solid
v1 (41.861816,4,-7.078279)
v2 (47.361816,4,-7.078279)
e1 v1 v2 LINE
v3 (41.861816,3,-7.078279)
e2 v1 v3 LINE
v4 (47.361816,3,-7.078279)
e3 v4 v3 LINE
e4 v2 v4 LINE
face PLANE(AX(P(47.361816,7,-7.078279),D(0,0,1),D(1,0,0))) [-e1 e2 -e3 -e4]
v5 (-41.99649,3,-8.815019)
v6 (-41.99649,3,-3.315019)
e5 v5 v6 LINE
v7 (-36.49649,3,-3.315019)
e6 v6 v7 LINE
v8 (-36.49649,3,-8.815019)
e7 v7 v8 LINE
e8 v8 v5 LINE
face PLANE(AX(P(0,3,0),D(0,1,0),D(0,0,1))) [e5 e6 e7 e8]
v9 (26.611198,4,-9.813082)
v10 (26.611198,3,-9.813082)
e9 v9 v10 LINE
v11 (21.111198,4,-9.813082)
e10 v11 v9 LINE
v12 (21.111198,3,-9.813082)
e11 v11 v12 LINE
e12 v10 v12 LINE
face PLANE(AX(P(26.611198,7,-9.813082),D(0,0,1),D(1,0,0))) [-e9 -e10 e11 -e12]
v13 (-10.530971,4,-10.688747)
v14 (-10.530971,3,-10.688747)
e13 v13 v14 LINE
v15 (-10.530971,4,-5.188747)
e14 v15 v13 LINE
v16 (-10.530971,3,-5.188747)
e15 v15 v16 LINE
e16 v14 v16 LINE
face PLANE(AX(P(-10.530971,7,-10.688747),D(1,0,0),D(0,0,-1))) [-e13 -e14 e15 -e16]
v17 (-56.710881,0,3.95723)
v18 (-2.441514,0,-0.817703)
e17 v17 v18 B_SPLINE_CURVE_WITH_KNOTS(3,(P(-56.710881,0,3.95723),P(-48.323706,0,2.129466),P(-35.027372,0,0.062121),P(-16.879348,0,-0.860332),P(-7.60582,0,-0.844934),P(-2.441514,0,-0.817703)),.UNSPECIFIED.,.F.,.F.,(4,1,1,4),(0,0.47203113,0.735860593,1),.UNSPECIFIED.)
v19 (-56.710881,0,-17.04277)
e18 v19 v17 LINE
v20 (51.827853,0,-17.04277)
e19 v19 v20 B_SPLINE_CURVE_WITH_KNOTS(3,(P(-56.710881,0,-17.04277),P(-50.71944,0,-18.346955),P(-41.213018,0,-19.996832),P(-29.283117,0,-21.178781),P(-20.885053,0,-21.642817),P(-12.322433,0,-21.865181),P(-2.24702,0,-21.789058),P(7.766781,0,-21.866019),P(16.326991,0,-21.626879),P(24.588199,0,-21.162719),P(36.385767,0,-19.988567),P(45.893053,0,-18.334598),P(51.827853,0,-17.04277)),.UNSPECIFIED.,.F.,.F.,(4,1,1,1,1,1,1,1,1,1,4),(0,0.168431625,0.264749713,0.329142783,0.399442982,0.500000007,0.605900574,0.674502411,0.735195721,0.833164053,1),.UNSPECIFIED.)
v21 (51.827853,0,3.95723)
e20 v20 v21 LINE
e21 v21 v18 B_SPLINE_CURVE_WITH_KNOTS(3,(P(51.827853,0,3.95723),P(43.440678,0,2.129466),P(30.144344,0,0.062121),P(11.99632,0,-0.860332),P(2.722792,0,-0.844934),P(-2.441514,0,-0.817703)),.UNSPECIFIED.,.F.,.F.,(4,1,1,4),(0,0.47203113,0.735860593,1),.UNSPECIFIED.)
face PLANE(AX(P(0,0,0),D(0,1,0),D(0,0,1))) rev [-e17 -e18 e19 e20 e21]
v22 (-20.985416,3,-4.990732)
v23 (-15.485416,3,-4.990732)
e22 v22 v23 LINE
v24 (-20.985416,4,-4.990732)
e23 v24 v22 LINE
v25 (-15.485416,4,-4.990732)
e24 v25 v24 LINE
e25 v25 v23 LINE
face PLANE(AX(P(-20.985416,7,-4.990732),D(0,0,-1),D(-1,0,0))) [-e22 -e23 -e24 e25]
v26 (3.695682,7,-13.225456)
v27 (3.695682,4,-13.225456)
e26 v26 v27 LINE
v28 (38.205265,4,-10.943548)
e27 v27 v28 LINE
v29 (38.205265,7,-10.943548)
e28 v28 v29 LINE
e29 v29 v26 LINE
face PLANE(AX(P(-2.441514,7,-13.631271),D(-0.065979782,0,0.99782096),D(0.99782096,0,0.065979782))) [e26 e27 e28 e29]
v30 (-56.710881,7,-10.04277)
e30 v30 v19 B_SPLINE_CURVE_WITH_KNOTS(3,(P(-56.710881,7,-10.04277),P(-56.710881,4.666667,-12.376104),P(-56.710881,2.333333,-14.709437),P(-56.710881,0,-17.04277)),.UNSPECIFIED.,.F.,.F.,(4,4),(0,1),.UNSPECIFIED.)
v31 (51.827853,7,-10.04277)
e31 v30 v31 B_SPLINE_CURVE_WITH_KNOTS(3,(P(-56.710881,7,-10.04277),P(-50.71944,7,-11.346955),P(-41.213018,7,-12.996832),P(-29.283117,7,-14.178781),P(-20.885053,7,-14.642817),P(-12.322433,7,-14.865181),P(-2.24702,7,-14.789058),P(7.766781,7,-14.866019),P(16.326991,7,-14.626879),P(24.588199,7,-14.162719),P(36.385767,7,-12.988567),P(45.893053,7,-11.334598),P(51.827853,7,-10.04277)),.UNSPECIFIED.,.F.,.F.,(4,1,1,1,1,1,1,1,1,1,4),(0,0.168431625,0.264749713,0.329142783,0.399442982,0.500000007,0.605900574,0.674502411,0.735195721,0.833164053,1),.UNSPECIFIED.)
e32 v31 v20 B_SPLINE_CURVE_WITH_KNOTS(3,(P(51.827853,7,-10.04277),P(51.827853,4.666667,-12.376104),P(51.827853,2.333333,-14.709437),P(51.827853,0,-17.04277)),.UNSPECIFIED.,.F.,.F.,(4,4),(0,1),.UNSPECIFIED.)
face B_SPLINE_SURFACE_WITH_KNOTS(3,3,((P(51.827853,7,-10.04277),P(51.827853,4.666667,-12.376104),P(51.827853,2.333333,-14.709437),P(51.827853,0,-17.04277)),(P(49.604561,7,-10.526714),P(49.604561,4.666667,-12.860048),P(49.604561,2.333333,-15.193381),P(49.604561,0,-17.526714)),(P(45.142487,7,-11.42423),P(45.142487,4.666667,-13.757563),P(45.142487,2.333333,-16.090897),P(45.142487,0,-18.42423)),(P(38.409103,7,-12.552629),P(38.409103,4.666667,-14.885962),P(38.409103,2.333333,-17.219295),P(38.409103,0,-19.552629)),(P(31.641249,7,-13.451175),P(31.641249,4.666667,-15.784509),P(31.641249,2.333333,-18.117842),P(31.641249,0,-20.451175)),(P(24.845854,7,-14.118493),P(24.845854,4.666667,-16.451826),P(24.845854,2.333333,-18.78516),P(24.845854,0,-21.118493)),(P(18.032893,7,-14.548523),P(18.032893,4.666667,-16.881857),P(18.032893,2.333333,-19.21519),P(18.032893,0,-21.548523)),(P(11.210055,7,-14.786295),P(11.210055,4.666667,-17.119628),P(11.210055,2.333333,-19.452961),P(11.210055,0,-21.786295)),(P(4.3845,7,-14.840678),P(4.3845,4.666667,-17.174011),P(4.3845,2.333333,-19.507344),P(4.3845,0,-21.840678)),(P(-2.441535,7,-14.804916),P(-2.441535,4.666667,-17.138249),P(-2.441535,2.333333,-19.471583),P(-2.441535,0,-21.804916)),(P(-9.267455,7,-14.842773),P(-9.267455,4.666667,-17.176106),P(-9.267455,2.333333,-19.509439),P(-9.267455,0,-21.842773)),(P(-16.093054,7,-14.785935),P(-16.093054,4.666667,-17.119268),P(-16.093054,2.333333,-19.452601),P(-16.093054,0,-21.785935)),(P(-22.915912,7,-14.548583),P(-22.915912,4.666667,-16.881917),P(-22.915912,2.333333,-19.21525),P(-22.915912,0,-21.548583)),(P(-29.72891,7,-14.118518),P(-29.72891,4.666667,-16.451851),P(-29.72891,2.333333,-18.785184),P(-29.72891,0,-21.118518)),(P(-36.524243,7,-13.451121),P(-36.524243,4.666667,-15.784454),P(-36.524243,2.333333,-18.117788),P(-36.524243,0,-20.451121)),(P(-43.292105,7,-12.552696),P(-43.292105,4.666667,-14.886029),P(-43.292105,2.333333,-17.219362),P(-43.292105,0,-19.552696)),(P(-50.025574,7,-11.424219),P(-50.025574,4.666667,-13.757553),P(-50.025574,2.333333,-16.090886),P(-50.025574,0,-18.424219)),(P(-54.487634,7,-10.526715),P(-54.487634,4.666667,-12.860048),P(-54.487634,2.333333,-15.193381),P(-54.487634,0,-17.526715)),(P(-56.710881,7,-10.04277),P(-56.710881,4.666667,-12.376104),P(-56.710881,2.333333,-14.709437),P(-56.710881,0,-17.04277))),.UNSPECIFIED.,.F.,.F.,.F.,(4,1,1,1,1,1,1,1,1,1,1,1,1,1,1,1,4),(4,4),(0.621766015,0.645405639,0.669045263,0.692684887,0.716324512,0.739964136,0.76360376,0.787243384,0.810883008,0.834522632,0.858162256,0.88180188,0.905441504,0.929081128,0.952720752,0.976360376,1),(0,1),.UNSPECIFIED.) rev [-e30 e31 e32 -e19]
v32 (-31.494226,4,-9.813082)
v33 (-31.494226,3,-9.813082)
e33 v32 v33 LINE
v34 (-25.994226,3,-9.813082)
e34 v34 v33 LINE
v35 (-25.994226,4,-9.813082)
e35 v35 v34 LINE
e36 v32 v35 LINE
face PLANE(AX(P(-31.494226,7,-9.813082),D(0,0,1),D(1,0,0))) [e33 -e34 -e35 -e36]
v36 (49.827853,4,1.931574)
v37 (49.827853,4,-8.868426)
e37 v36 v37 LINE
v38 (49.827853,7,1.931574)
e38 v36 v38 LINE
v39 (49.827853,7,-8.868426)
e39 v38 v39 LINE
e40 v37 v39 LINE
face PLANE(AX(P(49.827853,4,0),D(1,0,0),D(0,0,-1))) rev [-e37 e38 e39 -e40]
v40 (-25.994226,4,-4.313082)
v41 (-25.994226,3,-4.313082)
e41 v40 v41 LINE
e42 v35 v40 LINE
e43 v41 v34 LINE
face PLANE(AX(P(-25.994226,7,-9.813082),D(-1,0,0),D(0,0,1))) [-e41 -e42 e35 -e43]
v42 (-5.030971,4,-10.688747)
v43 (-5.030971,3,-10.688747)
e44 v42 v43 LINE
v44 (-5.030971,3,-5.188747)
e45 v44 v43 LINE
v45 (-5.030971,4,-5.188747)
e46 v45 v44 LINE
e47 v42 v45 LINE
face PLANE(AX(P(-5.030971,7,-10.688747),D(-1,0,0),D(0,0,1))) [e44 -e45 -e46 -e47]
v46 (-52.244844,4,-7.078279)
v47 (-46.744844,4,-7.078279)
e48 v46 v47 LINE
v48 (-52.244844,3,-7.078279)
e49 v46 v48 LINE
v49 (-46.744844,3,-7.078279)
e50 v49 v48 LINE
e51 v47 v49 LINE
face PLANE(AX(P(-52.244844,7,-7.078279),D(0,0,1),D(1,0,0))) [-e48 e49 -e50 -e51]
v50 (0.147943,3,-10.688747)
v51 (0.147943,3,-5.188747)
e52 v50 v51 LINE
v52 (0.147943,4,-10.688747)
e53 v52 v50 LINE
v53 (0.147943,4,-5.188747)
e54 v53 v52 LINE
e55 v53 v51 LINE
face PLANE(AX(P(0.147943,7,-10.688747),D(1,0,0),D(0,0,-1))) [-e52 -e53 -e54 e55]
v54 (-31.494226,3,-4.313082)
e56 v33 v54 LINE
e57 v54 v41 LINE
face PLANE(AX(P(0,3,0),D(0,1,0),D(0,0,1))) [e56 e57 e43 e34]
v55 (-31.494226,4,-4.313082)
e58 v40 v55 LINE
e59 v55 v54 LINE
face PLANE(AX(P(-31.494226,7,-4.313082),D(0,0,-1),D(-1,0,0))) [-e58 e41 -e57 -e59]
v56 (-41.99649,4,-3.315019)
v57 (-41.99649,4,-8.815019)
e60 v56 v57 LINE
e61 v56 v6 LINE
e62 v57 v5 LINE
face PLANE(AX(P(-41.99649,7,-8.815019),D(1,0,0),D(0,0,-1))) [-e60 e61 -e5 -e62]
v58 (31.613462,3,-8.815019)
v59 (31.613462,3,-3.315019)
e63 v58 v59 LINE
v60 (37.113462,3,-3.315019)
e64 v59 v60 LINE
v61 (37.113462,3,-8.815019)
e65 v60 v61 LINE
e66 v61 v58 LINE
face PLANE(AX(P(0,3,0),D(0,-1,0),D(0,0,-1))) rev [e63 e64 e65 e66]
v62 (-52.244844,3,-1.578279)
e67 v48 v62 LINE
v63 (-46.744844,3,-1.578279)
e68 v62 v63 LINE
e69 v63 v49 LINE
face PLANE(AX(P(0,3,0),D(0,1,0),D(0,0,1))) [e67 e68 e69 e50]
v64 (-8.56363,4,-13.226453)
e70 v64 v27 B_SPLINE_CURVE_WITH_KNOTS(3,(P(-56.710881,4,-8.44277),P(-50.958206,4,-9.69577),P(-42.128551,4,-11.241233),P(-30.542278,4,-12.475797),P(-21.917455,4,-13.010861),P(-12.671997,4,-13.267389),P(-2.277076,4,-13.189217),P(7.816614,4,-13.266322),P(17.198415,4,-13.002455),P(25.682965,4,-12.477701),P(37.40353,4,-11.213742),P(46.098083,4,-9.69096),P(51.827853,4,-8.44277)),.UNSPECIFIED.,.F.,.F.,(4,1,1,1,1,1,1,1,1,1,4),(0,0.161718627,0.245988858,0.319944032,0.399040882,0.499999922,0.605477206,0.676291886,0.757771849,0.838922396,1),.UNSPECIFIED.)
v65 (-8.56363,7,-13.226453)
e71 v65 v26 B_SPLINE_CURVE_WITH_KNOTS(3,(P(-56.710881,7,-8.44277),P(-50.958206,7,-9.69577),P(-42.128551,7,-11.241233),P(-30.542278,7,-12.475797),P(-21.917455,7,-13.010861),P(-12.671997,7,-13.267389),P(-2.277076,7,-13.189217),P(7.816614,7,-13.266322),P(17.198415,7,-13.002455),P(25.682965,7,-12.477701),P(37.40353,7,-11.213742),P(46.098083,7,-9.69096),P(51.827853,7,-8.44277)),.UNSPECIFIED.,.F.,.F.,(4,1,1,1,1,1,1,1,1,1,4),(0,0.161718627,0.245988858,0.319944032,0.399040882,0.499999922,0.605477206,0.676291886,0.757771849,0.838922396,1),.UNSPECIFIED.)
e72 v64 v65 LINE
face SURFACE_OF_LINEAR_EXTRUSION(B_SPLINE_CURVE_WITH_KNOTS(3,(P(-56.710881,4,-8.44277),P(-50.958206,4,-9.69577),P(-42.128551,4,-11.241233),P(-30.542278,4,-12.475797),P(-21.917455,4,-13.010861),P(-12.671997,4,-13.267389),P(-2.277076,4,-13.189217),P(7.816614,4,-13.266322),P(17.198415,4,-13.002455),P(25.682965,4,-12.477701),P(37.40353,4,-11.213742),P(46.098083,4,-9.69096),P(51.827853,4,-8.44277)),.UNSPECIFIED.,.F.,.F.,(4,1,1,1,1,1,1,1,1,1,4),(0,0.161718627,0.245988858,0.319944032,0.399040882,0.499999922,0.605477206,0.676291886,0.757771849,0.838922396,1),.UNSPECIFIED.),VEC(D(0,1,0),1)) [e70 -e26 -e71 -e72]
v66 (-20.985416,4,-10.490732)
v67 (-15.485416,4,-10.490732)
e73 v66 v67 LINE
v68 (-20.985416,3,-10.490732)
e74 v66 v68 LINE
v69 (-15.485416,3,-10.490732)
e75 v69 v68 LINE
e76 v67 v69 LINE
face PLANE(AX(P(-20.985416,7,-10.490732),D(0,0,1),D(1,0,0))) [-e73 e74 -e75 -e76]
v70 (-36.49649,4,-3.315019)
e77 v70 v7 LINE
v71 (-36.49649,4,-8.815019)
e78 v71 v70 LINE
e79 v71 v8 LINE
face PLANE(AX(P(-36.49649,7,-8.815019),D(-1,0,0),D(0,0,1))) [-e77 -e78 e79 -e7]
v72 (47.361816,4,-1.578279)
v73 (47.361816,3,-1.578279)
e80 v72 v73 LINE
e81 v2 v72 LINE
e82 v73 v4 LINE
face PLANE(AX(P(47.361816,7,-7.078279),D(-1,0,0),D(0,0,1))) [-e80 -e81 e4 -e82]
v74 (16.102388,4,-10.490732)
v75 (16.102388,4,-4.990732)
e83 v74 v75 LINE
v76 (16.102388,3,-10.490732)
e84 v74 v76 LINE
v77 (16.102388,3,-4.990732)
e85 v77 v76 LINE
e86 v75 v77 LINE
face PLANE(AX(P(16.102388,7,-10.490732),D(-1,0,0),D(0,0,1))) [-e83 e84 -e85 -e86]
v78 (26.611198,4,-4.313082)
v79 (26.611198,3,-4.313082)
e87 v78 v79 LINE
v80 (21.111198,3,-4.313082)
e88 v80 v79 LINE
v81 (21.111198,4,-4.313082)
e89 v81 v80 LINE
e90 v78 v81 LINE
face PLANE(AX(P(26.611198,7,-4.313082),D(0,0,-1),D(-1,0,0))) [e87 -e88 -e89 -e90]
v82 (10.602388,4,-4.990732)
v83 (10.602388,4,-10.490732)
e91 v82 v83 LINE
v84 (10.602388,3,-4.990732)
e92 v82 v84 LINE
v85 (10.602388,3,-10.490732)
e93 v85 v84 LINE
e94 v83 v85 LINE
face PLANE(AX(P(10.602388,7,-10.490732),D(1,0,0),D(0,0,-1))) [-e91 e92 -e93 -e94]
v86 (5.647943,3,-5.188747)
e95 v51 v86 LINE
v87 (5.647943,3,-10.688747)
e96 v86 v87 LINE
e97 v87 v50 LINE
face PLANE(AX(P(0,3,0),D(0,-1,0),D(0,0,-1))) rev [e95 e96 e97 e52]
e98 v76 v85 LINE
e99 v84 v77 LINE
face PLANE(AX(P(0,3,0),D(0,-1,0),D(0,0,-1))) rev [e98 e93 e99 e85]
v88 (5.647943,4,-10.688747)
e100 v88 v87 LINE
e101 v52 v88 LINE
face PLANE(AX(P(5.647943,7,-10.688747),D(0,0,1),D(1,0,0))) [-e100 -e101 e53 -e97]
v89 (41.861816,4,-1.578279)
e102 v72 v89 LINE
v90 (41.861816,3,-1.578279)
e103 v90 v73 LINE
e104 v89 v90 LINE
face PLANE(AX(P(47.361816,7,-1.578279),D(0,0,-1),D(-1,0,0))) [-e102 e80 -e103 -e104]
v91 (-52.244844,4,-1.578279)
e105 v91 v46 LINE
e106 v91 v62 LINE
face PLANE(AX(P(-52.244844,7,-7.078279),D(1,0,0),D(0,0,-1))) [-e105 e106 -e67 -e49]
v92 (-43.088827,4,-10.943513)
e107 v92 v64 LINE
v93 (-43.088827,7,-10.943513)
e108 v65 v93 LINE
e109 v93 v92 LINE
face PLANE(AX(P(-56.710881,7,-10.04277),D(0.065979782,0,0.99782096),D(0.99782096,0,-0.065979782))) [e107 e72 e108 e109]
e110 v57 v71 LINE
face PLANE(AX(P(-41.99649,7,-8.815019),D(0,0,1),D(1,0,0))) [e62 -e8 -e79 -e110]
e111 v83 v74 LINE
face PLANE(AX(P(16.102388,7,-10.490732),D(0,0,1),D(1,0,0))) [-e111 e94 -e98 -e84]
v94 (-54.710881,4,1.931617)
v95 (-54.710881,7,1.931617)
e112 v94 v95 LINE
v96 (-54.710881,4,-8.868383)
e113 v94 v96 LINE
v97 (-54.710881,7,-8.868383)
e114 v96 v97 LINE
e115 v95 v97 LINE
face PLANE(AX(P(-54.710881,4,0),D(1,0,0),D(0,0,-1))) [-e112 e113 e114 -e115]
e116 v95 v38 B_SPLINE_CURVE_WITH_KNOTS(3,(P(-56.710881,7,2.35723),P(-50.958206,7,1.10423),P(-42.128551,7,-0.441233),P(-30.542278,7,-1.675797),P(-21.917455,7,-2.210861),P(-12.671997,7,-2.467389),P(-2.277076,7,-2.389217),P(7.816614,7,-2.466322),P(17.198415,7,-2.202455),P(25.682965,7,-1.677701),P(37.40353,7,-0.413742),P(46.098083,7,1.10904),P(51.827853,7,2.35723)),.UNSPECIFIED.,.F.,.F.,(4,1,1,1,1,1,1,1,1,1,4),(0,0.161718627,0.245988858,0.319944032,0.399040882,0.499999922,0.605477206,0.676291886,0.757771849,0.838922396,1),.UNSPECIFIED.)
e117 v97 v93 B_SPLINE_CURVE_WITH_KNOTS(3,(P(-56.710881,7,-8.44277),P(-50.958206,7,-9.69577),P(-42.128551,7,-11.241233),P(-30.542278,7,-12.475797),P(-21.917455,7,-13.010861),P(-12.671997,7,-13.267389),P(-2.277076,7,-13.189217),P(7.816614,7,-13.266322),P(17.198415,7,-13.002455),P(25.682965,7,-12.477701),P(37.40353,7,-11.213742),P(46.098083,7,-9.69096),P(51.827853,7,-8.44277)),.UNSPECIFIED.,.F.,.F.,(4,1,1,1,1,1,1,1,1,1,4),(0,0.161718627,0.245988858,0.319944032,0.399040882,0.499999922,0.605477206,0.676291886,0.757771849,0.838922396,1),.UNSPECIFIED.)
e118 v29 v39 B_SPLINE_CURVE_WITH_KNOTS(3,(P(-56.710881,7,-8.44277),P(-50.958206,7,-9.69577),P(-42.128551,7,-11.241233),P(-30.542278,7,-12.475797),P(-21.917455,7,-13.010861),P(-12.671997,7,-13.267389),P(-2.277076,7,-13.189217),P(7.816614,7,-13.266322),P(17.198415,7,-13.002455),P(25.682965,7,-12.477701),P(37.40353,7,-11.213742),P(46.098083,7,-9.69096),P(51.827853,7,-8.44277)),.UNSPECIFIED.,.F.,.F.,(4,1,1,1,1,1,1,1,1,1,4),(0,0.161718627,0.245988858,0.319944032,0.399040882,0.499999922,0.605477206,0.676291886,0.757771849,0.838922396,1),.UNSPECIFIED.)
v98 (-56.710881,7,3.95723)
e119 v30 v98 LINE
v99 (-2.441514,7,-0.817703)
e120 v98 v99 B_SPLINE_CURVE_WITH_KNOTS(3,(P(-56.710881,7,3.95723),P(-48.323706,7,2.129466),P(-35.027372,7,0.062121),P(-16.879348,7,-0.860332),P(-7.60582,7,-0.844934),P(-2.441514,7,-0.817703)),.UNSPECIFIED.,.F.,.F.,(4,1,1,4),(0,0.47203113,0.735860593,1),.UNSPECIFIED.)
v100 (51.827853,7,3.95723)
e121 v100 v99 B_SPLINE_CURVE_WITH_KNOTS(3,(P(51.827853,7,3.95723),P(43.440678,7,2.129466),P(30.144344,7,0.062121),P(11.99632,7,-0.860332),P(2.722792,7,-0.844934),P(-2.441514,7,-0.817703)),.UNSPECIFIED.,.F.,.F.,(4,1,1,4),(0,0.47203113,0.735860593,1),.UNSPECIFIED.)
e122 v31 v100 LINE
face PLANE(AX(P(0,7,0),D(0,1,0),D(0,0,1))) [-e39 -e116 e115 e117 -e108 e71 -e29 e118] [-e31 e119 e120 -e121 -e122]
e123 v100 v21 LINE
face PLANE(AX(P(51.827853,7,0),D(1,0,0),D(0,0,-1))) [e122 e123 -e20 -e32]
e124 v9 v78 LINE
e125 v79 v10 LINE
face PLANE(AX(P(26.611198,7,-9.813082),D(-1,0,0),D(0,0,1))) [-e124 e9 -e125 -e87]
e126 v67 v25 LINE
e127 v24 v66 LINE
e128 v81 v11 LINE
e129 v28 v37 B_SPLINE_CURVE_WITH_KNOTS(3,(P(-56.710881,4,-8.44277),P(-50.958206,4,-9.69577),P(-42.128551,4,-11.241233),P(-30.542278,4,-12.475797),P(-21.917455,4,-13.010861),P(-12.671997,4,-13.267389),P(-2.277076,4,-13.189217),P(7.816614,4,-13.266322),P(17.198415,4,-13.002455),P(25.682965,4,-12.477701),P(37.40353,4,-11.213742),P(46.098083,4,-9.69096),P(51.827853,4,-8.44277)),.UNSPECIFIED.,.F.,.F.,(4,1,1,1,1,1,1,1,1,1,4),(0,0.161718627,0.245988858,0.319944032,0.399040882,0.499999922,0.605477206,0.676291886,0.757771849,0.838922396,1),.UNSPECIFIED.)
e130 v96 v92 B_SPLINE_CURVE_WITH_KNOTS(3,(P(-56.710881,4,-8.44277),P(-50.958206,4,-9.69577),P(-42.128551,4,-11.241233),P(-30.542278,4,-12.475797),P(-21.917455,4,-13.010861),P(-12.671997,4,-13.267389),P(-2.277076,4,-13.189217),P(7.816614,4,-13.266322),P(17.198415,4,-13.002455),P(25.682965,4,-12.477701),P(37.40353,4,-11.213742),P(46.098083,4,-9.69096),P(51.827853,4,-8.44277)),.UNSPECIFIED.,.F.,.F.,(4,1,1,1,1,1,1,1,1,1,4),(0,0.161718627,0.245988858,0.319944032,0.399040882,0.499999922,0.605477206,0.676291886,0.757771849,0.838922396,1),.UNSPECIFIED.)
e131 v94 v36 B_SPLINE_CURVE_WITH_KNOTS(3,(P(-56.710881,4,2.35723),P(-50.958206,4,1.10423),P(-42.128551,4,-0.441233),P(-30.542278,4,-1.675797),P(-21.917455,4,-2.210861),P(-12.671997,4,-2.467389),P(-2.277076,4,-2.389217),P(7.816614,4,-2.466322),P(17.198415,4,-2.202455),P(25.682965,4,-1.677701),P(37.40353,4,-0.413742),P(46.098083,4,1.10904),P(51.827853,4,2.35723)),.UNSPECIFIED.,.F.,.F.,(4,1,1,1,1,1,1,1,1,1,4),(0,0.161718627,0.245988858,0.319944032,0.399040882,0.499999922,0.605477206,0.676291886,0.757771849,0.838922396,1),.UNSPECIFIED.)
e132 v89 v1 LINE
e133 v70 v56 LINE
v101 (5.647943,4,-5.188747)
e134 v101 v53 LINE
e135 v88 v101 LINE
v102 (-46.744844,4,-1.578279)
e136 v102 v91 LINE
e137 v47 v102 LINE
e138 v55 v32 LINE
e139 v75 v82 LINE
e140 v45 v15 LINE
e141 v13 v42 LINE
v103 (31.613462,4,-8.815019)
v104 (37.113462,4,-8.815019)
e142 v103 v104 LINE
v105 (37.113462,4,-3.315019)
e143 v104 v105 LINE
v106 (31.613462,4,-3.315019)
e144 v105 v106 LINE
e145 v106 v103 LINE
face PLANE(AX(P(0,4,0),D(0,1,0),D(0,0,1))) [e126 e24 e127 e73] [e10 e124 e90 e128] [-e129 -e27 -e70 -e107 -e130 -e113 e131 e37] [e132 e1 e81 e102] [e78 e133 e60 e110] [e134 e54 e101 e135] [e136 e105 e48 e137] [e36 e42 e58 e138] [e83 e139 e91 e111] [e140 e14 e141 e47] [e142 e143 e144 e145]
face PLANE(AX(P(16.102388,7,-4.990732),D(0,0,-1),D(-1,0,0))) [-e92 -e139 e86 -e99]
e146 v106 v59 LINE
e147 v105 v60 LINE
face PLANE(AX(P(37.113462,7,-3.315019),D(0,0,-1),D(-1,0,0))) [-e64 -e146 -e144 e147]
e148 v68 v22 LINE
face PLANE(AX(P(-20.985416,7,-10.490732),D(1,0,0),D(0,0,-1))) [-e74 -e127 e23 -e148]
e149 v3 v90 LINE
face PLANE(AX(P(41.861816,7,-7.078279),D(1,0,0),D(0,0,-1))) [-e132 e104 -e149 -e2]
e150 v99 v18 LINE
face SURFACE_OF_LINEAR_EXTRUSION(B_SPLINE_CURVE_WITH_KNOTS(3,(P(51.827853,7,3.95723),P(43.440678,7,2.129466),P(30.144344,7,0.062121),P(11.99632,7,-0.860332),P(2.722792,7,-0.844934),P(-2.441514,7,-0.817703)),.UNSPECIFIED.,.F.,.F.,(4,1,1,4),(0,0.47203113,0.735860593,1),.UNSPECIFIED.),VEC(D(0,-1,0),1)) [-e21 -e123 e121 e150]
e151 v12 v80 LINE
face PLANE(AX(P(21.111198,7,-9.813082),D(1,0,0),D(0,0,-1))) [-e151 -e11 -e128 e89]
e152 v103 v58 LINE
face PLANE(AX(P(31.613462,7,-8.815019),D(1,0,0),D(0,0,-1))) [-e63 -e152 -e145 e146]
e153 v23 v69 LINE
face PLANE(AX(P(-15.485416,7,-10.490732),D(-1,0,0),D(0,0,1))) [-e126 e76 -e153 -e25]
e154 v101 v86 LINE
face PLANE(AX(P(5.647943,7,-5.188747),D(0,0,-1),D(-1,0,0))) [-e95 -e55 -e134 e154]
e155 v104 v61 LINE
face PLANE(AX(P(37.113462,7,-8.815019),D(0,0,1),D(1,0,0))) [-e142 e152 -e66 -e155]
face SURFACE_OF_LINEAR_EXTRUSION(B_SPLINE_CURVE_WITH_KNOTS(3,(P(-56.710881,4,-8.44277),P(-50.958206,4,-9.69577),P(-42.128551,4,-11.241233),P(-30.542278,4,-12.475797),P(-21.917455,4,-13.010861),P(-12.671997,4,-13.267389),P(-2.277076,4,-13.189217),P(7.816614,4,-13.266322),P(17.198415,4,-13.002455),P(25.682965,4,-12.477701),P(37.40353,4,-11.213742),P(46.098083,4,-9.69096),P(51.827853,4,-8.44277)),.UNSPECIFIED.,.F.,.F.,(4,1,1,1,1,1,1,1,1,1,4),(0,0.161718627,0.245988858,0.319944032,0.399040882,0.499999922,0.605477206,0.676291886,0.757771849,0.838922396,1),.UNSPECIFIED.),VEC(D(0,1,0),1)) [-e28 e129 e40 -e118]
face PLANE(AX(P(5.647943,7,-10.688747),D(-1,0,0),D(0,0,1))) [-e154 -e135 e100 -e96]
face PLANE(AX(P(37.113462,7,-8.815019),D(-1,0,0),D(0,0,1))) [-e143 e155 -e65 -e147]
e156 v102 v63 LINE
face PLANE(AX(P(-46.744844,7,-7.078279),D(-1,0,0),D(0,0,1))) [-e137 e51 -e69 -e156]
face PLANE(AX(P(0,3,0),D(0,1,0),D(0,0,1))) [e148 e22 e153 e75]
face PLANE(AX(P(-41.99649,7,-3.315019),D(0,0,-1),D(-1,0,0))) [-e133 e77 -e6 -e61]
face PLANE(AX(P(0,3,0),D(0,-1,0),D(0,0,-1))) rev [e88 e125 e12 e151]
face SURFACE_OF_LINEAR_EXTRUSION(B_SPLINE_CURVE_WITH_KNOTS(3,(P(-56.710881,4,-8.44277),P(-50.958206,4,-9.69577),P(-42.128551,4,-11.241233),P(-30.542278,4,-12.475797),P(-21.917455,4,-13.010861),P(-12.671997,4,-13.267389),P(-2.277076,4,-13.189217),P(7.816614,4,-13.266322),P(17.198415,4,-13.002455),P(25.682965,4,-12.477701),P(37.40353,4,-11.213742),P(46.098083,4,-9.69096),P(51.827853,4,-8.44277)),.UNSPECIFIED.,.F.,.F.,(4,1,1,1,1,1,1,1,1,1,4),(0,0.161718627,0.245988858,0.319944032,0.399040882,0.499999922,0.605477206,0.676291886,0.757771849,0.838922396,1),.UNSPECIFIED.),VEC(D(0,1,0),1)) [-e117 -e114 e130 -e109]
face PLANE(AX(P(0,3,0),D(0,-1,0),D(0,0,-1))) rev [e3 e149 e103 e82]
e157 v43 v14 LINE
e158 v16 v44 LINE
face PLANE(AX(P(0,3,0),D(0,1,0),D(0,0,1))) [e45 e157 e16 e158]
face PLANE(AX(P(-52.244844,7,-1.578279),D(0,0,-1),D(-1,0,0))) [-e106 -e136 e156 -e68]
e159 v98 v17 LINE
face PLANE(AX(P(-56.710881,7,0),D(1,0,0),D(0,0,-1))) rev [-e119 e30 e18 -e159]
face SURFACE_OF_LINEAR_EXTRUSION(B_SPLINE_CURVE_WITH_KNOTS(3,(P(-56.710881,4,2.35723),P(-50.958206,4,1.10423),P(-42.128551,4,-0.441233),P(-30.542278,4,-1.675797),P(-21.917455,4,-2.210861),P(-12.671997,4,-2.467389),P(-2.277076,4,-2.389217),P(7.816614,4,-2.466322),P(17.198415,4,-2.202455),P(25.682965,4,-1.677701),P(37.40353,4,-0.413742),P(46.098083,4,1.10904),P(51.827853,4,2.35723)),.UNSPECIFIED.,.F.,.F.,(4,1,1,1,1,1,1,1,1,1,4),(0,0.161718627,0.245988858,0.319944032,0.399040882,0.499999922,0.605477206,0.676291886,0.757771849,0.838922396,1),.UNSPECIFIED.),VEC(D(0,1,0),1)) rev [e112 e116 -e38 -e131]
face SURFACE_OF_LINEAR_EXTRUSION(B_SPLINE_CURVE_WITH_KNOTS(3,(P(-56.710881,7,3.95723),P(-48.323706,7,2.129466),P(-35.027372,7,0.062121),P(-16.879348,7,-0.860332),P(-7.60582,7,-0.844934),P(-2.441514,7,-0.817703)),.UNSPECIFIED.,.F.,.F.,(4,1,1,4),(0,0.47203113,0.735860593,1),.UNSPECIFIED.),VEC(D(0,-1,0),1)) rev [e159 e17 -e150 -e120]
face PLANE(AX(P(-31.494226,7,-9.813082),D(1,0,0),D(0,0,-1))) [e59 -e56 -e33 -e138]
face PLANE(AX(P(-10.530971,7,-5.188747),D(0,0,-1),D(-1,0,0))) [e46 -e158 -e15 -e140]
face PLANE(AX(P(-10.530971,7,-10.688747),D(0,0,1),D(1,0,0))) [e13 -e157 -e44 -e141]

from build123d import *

# Parameters (mm, degrees)
BOSS_EXTRUDE1_DEPTH     = 7
CUT_EXTRUDE1_DEPTH      = 3
CUT_EXTRUDE2_DEPTH      = 59.755326779
CUT_EXTRUDE2_DEPTH_BACK = 1
SKETCH5_W               = 5.5
SKETCH5_H               = 5.5
BOSS_EXTRUDE2_DEPTH     = 7
CUT_LOFT3_START         = -28.140767726
CUT_LOFT3_DEPTH         = 25.989204331


# Read off the part's stored shape, not the designer's step: Cut-Loft3
with BuildPart() as part:
    # Sketch1 → Boss-Extrude1 (new body)
    with BuildSketch(Plane(origin=(0, 0, 0), x_dir=(1, 0, 0), z_dir=(0, 1, 0))):
        with BuildLine():
            Line((-56.7108806, 8.042770274), (-56.7108806, 6.805307476))
            Line((-56.7108806, 6.805307476), (51.827852841, 6.805307476))
            Line((51.827852841, 6.805307476), (51.827852841, 8.042770274))
            add(Edge.make_bspline(
                [(51.827852841, 8.042770274), (43.440678216, 9.870534091), (30.144344491, 11.93787877), (11.99631981, 12.860332352), (2.722791962, 12.844934175), (-2.44151388, 12.817702683)],
                knots=[0, 0, 0, 0, 0.47203113, 0.735860593, 1, 1, 1, 1], degree=3))
            add(Edge.make_bspline(
                [(-56.7108806, 8.042770274), (-48.323705975, 9.870534091), (-35.02737225, 11.93787877), (-16.87934757, 12.860332352), (-7.605819721, 12.844934175), (-2.44151388, 12.817702683)],
                knots=[0, 0, 0, 0, 0.47203113, 0.735860593, 1, 1, 1, 1], degree=3))
        make_face()
        with BuildLine():
            Line((51.827852841, 6.805307476), (-56.7108806, 6.805307476))
            Line((-56.7108806, 6.805307476), (-56.7108806, -1.957229726))
            add(Edge.make_bspline(
                [(-56.7108806, -1.957229726), (-48.323705975, -0.129465909), (-35.02737225, 1.93787877), (-16.87934757, 2.860332352), (-7.605819721, 2.844934175), (-2.44151388, 2.817702683)],
                knots=[0, 0, 0, 0, 0.47203113, 0.735860593, 1, 1, 1, 1], degree=3))
            add(Edge.make_bspline(
                [(51.827852841, -1.957229726), (43.440678216, -0.129465909), (30.144344491, 1.93787877), (11.99631981, 2.860332352), (2.722791962, 2.844934175), (-2.44151388, 2.817702683)],
                knots=[0, 0, 0, 0, 0.47203113, 0.735860593, 1, 1, 1, 1], degree=3))
            Line((51.827852841, -1.957229726), (51.827852841, 6.805307476))
        make_face()
        with BuildLine():
            add(Edge.make_bspline(
                [(-56.7108806, -1.957229726), (-48.323705975, -0.129465909), (-35.02737225, 1.93787877), (-16.87934757, 2.860332352), (-7.605819721, 2.844934175), (-2.44151388, 2.817702683)],
                knots=[0, 0, 0, 0, 0.47203113, 0.735860593, 1, 1, 1, 1], degree=3))
            Line((-56.7108806, -1.957229726), (-56.7108806, -3.957229726))
            add(Edge.make_bspline(
                [(-56.7108806, -3.957229726), (-48.323705975, -2.129465909), (-35.02737225, -0.06212123), (-16.87934757, 0.860332352), (-7.605819721, 0.844934175), (-2.44151388, 0.817702683)],
                knots=[0, 0, 0, 0, 0.47203113, 0.735860593, 1, 1, 1, 1], degree=3))
            add(Edge.make_bspline(
                [(51.827852841, -3.957229726), (43.440678216, -2.129465909), (30.144344491, -0.06212123), (11.99631981, 0.860332352), (2.722791962, 0.844934175), (-2.44151388, 0.817702683)],
                knots=[0, 0, 0, 0, 0.47203113, 0.735860593, 1, 1, 1, 1], degree=3))
            Line((51.827852841, -3.957229726), (51.827852841, -1.957229726))
            add(Edge.make_bspline(
                [(51.827852841, -1.957229726), (43.440678216, -0.129465909), (30.144344491, 1.93787877), (11.99631981, 2.860332352), (2.722791962, 2.844934175), (-2.44151388, 2.817702683)],
                knots=[0, 0, 0, 0, 0.47203113, 0.735860593, 1, 1, 1, 1], degree=3))
        make_face()
        with BuildLine():
            Line((-56.7108806, 10.042770274), (-56.7108806, 8.042770274))
            add(Edge.make_bspline(
                [(-56.7108806, 8.042770274), (-48.323705975, 9.870534091), (-35.02737225, 11.93787877), (-16.87934757, 12.860332352), (-7.605819721, 12.844934175), (-2.44151388, 12.817702683)],
                knots=[0, 0, 0, 0, 0.47203113, 0.735860593, 1, 1, 1, 1], degree=3))
            add(Edge.make_bspline(
                [(51.827852841, 8.042770274), (43.440678216, 9.870534091), (30.144344491, 11.93787877), (11.99631981, 12.860332352), (2.722791962, 12.844934175), (-2.44151388, 12.817702683)],
                knots=[0, 0, 0, 0, 0.47203113, 0.735860593, 1, 1, 1, 1], degree=3))
            Line((51.827852841, 8.042770274), (51.827852841, 10.042770274))
            add(Edge.make_bspline(
                [(51.827852841, 10.042770274), (43.440678216, 11.870534091), (30.144344491, 13.93787877), (11.99631981, 14.860332352), (2.722791962, 14.844934175), (-2.44151388, 14.817702683)],
                knots=[0, 0, 0, 0, 0.47203113, 0.735860593, 1, 1, 1, 1], degree=3))
            add(Edge.make_bspline(
                [(-56.7108806, 10.042770274), (-48.323705975, 11.870534091), (-35.02737225, 13.93787877), (-16.87934757, 14.860332352), (-7.605819721, 14.844934175), (-2.44151388, 14.817702683)],
                knots=[0, 0, 0, 0, 0.47203113, 0.735860593, 1, 1, 1, 1], degree=3))
        make_face()
    extrude(amount=BOSS_EXTRUDE1_DEPTH)

    # Sketch3 → Cut-Extrude1 (cut)
    with BuildSketch(Plane(origin=(0, 7, 0), x_dir=(1, 0, 0), z_dir=(0, 1, 0))):
        with BuildLine():
            Line((-54.7108806, 8.868382777), (-54.7108806, -1.931617223))
            add(Edge.make_bspline(
                [(-54.7108806, -1.931617223), (-49.613724747, -0.872437915), (-41.450567172, 0.513475106), (-30.542278229, 1.675797263), (-21.917454503, 2.210860945), (-12.671997291, 2.467388615), (-2.277076443, 2.389216594), (7.816613622, 2.466322462), (17.198414715, 2.202454548), (25.682964859, 1.677700715), (36.725653994, 0.486844708), (44.753602523, -0.877090687), (49.827852841, -1.931574108)],
                knots=[0.018721889, 0.018721889, 0.018721889, 0.018721889, 0.161718627, 0.245988858, 0.319944032, 0.399040882, 0.499999922, 0.605477206, 0.676291886, 0.757771849, 0.838922396, 0.98127786, 0.98127786, 0.98127786, 0.98127786], degree=3))
            Line((49.827852841, -1.931574108), (49.827852841, 8.868425892))
            add(Edge.make_bspline(
                [(-54.7108806, 8.868382777), (-49.613724747, 9.927562085), (-41.450567172, 11.313475106), (-30.542278229, 12.475797263), (-21.917454503, 13.010860945), (-12.671997291, 13.267388615), (-2.277076443, 13.189216594), (7.816613622, 13.266322462), (17.198414715, 13.002454548), (25.682964859, 12.477700715), (36.725653994, 11.286844708), (44.753602523, 9.922909313), (49.827852841, 8.868425892)],
                knots=[0.018721889, 0.018721889, 0.018721889, 0.018721889, 0.161718627, 0.245988858, 0.319944032, 0.399040882, 0.499999922, 0.605477206, 0.676291886, 0.757771849, 0.838922396, 0.98127786, 0.98127786, 0.98127786, 0.98127786], degree=3))
        make_face()
    extrude(amount=-CUT_EXTRUDE1_DEPTH, mode=Mode.SUBTRACT)

    # Sketch5 → Cut-Extrude2 (cut, two sides: drawn at the far end of the back side and taken through both)
    with BuildSketch(Plane(origin=(0, 4, 0), x_dir=(1, 0, 0), z_dir=(0, 1, 0)).offset(-CUT_EXTRUDE2_DEPTH_BACK)):
        with Locations((-49.494843654, 4.328278982)):
            Rectangle(SKETCH5_W, SKETCH5_H)
        with Locations((-39.246490197, 6.065019164)):
            Rectangle(SKETCH5_W, SKETCH5_H)
        with Locations((-28.744225873, 7.063081882)):
            Rectangle(SKETCH5_W, SKETCH5_H)
        with Locations((-18.235416091, 7.740731917)):
            Rectangle(SKETCH5_W, SKETCH5_H)
        with Locations((-7.78097109, 7.938746568)):
            Rectangle(SKETCH5_W, SKETCH5_H)
        with Locations((2.897943331, 7.938746568)):
            Rectangle(SKETCH5_W, SKETCH5_H)
        with Locations((13.352388332, 7.740731917)):
            Rectangle(SKETCH5_W, SKETCH5_H)
        with Locations((23.861198114, 7.063081882)):
            Rectangle(SKETCH5_W, SKETCH5_H)
        with Locations((34.363462438, 6.065019164)):
            Rectangle(SKETCH5_W, SKETCH5_H)
        with Locations((44.611815895, 4.328278982)):
            Rectangle(SKETCH5_W, SKETCH5_H)
    extrude(amount=CUT_EXTRUDE2_DEPTH + CUT_EXTRUDE2_DEPTH_BACK, mode=Mode.SUBTRACT)

    # Sketch6 → Boss-Extrude2 (add)
    with BuildSketch(Plane.XZ):
        Polygon((-56.7108806, -10.042770274), (-56.7108806, -39.797055232), (51.827852841, -39.797055232), (51.827852841, -10.042770274), (-2.44151388, -13.631270719), align=None)
    extrude(amount=-BOSS_EXTRUDE2_DEPTH)

    # Cut-Loft3 outline → Cut-Loft3 (cut)
    with BuildSketch(Plane(origin=(0, 0, 0), x_dir=(1, 0, 0), z_dir=(0, 0.7071067811865518, 0.7071067811865432)).offset(CUT_LOFT3_START)):
        with BuildLine():
            add(Edge.make_bspline(
                [(51.827852841, 12.051058431), (49.604561047, 12.393258463), (45.142487075, 13.027898019), (38.409103261, 13.825796232), (31.641249387, 14.461164843), (24.84585392, 14.933029584), (18.032893375, 15.237107028), (11.210055122, 15.405236678), (4.384500343, 15.443691251), (-2.441535298, 15.418403963), (-9.267454577, 15.445172671), (-16.093054432, 15.404982103), (-22.915912391, 15.237149433), (-29.728909591, 14.933046954), (-36.524242812, 14.461126298), (-43.292105117, 13.825843609), (-50.025574302, 13.027890419), (-54.487633846, 12.393258899), (-56.7108806, 12.051058431)],
                knots=[0.621766015, 0.621766015, 0.621766015, 0.621766015, 0.645405639, 0.669045263, 0.692684887, 0.716324512, 0.739964136, 0.76360376, 0.787243384, 0.810883008, 0.834522632, 0.858162256, 0.88180188, 0.905441504, 0.929081128, 0.952720752, 0.976360376, 1, 1, 1, 1], degree=3))
            Line((51.827852841, 12.051058431), (51.827852841, 35))
            Line((51.827852841, 35), (-56.7108806, 35))
            Line((-56.7108806, 35), (-56.7108806, 12.051058431))
        make_face()
    extrude(amount=CUT_LOFT3_DEPTH, mode=Mode.SUBTRACT)


solid = part.part
